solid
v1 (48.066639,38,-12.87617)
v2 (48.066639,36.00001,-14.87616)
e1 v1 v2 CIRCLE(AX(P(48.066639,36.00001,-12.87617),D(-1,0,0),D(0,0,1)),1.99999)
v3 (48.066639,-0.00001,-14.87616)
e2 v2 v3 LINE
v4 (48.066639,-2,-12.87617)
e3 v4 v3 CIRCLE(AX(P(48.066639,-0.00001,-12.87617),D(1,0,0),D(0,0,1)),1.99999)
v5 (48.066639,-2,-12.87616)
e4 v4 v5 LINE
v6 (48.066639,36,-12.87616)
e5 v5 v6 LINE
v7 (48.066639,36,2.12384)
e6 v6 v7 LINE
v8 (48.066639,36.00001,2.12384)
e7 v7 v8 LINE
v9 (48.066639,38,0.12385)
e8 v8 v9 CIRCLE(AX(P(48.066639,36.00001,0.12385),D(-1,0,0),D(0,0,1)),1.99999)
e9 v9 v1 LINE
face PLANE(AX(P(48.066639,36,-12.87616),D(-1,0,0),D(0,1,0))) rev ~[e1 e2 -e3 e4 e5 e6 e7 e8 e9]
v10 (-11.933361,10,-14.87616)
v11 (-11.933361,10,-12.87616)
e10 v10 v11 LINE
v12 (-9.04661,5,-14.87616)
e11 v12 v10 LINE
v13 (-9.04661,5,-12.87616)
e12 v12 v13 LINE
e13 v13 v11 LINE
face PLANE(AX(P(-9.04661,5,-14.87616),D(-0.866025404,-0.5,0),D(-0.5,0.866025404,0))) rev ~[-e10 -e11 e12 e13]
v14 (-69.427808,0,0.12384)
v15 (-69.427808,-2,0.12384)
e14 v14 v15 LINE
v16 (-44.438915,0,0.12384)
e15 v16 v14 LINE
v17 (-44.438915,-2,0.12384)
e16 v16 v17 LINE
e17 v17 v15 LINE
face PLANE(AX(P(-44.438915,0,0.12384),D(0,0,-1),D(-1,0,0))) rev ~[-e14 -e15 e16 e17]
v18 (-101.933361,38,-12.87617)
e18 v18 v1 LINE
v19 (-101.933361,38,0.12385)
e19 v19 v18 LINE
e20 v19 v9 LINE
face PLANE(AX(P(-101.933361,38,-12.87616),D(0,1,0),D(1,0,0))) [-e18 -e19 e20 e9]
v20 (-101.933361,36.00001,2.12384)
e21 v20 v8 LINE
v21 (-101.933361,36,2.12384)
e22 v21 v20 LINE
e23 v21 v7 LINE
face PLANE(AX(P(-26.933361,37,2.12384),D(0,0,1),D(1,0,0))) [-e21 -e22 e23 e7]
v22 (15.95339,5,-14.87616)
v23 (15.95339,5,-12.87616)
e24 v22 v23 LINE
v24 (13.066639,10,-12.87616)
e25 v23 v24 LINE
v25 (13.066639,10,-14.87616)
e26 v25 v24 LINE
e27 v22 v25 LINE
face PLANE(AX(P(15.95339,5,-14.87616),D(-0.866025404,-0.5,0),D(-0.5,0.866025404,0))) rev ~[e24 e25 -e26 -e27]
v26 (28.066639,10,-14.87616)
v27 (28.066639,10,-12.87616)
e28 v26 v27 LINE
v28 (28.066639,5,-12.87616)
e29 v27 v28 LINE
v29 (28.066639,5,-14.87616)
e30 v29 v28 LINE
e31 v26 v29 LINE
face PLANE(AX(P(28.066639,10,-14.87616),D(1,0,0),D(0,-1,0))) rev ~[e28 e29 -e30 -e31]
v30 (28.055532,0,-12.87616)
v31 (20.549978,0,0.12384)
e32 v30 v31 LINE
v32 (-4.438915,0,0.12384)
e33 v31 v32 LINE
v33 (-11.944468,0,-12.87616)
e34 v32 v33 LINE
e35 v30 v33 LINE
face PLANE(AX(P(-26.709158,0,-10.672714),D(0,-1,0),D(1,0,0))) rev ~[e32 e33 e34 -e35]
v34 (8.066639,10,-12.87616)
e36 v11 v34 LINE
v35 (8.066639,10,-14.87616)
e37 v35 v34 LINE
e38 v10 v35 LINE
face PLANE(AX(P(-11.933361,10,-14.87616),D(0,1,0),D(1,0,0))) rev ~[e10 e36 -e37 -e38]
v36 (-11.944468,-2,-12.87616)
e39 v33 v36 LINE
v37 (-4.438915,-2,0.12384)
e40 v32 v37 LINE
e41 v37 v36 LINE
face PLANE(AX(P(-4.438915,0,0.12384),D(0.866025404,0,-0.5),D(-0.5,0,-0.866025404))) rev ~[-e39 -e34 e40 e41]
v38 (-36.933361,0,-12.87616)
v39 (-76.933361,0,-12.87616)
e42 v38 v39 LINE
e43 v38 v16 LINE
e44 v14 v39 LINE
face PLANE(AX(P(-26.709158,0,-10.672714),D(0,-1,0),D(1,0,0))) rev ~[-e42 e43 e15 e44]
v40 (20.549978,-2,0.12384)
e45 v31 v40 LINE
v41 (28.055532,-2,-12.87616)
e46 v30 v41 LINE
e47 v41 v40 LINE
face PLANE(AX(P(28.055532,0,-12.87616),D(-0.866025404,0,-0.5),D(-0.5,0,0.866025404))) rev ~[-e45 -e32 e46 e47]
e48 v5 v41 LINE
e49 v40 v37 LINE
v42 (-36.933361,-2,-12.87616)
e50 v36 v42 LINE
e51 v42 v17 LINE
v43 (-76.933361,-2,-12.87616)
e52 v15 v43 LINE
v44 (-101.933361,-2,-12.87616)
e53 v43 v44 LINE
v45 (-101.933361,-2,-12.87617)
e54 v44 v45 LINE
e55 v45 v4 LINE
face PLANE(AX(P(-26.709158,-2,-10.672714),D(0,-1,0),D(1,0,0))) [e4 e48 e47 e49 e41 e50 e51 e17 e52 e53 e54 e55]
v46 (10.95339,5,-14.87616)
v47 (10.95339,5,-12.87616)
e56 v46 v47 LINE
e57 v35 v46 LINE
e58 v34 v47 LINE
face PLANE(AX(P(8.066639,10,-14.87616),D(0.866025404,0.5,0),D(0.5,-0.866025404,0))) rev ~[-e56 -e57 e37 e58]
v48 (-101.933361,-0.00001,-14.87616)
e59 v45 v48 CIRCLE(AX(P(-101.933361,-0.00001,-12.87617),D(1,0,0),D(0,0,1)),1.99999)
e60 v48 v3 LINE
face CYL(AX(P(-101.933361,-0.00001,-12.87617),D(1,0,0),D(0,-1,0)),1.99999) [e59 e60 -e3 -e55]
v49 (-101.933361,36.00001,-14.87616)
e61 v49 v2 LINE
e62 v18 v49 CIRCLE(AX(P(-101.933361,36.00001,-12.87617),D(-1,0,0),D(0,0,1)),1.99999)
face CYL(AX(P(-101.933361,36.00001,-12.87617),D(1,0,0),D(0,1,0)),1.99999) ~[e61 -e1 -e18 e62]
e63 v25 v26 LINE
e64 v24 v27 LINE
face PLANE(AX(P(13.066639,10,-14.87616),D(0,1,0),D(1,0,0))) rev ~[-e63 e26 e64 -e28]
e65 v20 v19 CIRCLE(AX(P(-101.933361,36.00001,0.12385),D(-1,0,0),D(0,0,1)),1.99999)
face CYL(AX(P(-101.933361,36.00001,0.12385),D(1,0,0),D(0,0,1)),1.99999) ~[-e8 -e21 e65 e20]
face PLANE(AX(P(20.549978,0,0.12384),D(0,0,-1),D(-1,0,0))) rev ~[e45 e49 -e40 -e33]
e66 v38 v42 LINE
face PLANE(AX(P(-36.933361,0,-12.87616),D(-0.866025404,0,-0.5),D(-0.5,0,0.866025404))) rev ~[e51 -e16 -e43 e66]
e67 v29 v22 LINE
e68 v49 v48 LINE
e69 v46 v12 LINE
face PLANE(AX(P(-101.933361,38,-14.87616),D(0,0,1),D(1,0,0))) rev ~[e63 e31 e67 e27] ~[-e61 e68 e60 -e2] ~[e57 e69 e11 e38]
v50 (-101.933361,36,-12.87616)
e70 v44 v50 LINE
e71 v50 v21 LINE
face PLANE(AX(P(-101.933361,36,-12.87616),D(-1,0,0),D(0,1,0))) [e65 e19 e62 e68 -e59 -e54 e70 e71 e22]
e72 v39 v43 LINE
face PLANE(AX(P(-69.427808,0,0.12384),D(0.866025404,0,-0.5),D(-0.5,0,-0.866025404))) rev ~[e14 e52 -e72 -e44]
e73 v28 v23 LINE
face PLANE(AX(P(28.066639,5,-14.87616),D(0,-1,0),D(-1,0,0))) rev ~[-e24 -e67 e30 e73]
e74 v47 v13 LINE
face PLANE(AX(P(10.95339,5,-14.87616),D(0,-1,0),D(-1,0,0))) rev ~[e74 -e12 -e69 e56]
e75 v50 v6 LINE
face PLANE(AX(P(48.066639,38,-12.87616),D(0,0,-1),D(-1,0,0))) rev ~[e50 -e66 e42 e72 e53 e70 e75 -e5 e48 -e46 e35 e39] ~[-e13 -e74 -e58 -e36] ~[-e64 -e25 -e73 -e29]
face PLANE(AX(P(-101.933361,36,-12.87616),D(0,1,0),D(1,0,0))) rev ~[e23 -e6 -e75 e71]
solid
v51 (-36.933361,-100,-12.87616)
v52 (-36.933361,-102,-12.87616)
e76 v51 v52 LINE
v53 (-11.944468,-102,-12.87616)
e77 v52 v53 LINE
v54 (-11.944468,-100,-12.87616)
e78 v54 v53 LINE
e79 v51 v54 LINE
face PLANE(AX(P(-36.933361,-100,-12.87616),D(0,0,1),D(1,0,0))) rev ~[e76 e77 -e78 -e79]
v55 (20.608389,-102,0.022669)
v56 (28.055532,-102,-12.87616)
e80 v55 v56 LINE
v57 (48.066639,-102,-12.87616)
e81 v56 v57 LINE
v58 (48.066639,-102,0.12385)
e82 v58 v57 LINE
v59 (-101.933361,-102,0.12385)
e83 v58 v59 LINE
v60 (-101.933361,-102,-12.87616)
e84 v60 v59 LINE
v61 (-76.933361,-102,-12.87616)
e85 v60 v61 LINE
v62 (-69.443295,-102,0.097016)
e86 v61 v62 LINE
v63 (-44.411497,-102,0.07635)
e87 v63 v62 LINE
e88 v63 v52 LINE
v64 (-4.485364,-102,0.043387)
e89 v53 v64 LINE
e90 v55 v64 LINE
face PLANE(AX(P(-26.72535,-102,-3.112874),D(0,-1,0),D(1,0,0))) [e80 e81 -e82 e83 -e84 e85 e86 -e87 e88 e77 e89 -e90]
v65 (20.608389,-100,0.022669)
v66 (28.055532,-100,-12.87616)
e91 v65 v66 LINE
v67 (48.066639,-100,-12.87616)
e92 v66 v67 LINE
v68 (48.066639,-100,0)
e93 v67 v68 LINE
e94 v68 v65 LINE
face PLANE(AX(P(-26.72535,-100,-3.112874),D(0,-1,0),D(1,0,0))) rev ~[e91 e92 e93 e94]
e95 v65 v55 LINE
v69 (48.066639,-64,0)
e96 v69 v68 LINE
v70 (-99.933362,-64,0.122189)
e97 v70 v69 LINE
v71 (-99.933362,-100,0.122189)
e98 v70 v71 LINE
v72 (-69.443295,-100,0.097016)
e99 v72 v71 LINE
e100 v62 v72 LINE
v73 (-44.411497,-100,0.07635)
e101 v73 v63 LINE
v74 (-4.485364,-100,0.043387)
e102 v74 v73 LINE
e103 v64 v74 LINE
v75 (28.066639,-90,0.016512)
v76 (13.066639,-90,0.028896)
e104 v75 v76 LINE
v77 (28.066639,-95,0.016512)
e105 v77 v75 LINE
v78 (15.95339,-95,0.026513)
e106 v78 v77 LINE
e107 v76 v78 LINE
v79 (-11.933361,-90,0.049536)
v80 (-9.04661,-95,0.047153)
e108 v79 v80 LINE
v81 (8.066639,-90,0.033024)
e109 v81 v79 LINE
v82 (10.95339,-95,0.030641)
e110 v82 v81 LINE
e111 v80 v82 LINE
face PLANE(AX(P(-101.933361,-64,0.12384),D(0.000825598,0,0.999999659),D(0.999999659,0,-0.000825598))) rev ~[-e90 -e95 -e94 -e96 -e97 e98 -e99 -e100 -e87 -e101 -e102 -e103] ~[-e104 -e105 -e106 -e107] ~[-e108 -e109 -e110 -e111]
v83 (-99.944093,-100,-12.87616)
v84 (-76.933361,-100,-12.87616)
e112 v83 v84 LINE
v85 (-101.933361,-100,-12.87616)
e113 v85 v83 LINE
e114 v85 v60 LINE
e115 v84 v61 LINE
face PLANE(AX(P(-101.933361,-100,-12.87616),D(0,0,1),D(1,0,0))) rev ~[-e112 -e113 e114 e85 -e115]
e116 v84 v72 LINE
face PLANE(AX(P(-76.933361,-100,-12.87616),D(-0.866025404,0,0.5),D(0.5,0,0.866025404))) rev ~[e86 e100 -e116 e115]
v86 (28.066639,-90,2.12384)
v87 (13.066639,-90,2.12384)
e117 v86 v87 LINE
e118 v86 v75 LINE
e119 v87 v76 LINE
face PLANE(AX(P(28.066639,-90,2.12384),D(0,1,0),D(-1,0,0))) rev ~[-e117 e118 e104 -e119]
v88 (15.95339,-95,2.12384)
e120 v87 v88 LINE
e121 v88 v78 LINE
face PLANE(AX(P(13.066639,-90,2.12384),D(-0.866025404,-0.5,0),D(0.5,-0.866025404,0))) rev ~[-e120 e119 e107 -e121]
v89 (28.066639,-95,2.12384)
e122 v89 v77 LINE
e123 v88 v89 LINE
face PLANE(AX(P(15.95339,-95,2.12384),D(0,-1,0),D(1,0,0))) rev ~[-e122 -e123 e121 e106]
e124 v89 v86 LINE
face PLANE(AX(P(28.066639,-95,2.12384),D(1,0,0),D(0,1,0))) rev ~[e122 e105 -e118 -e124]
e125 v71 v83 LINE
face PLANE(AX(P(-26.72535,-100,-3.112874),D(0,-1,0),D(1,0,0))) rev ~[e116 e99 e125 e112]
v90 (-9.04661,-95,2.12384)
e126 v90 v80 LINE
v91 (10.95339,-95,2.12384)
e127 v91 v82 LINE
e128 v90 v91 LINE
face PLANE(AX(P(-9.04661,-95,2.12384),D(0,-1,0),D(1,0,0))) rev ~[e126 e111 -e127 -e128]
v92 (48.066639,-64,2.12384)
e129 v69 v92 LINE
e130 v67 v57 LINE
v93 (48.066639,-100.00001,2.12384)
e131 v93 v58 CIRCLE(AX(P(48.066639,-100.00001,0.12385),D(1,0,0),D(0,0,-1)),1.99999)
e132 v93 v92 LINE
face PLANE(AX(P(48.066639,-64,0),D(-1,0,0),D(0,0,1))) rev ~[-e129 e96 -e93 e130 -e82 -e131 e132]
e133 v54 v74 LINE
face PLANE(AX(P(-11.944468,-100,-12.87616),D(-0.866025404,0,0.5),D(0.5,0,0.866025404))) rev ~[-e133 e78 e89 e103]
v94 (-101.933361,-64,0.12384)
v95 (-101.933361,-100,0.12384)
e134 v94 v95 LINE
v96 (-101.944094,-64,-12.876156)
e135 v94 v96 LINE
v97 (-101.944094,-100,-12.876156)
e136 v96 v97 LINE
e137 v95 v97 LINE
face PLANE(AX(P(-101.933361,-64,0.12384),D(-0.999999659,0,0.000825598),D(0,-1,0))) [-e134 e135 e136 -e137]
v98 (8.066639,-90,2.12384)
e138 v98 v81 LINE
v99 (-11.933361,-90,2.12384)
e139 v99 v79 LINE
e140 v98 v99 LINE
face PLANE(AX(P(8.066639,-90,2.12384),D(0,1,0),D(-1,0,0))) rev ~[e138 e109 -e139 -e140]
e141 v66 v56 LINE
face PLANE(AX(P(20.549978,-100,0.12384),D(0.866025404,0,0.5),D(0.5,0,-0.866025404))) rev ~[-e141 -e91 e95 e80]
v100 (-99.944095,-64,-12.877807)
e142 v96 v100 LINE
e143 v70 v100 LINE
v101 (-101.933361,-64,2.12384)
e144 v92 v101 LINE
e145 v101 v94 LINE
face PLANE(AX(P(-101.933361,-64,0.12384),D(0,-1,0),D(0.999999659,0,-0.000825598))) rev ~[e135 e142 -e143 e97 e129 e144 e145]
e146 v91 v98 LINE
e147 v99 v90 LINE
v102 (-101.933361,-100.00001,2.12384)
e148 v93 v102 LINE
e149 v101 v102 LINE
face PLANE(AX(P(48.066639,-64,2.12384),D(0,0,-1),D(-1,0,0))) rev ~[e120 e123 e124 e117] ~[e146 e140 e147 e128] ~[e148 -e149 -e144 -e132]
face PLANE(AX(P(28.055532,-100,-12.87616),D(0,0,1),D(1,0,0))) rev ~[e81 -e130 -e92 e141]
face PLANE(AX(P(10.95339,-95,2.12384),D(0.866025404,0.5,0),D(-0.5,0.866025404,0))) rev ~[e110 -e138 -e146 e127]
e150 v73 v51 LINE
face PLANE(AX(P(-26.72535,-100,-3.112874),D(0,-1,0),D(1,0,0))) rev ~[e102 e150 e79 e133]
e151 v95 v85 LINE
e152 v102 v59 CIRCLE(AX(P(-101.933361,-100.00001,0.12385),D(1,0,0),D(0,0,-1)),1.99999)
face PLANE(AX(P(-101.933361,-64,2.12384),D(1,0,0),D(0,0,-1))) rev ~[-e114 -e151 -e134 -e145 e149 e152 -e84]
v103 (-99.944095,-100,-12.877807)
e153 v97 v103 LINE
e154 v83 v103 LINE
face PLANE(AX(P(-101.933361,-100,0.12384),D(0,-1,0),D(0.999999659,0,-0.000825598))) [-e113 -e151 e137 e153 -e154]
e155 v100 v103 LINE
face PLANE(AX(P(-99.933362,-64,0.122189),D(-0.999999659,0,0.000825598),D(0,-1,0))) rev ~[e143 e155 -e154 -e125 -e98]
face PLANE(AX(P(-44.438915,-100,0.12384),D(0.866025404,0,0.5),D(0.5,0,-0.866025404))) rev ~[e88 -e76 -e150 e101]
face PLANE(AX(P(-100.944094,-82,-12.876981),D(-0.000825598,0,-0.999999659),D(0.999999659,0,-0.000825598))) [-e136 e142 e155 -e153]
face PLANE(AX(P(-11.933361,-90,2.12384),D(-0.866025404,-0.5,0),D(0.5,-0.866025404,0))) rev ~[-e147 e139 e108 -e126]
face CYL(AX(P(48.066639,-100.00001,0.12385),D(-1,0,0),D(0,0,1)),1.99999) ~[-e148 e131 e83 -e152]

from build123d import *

# Parameters (mm, degrees)
F1_DEPTH  = 2
F4_DEPTH  = 2
F7_DEPTH  = 38
F10_DEPTH = 38
F11_W     = 150
F11_H     = 2
F12_DEPTH = 15
F13_W     = 2
F13_H     = 36
F14_DEPTH = 13
F16_DEPTH = 25
F18_DEPTH = 25
F19_R     = 1.99999
F19_2_R   = 1.99999
F20_R     = 1.99999


# Not quite as in the source:
# - a fillet or chamfer is up to 0.001 mm smaller than in the source, because OpenCascade refuses the exact size


with BuildPart() as f1:
    # F0 (on Front) → F1 (new body)
    with BuildSketch(Plane.XZ):
        Polygon((-76.9333613626, -12.8761603036), (-101.9333613626, -12.8761603036), (-101.9333613626, -14.8761603036), (48.0666386374, -14.8761603036), (48.0666386374, -12.8761603036), (28.0555316385, -12.8761603036), (20.549978139, 0.1238396964), (-4.438914862, 0.1238396964), (-11.9444683615, -12.8761603036), (-36.9333613626, -12.8761603036), (-44.438914862, 0.1238396964), (-69.4278078631, 0.1238396964), align=None)
    extrude(amount=F1_DEPTH)

    # F6 (on offset) → F7 (join, through all)
    with BuildSketch(Plane.XZ.offset(-38)):
        Polygon((-36.9333613626, -12.8761603036), (-76.9333613626, -12.8761603036), (-101.9333613626, -12.8761603036), (-101.9333613626, -14.8761603036), (48.0666386374, -14.8761603036), (48.0666386374, -12.8761603036), (28.0555316385, -12.8761603036), (-11.9444683615, -12.8761603036), align=None)
    extrude(amount=F7_DEPTH)

    # F11 (on face) → F12 (join)
    with BuildSketch(Plane.XY.offset(-12.8761603036)):
        with Locations((-26.9333613626, 37)):
            Rectangle(F11_W, F11_H)
    extrude(amount=F12_DEPTH)

    # F17 (on face) → F18 (cut)
    with BuildSketch(Plane(origin=(0, 0, -14.8761603036), x_dir=(1, 0, 0), z_dir=(0, 0, -1))):
        Polygon((-11.9333613626, -10), (8.0666386374, -10), (10.9533899834, -5), (-9.0466100166, -5), align=None)
        Polygon((13.0666386374, -10), (28.0666386374, -10), (28.0666386374, -5), (15.9533899834, -5), align=None)
    extrude(amount=-F18_DEPTH, mode=Mode.SUBTRACT)

    # F19 (radius 2 in the source; OpenCascade refuses exactly that, so slightly less here)
    f19_edges = [f1.edges().sort_by_distance(p)[0] for p in [
        (-26.933361, 38, -14.87616),
        (-26.933361, 38, 2.12384),
    ]]
    fillet(f19_edges, radius=F19_R)

    # F20 (radius 2 in the source; OpenCascade refuses exactly that, so slightly less here)
    f20_edges = [f1.edges().sort_by_distance(p)[0] for p in [
        (-26.933361, -2, -14.87616),
    ]]
    fillet(f20_edges, radius=F20_R)


with BuildPart() as f4:
    # F3 (on offset) → F4 (new body)
    with BuildSketch(Plane.XZ.offset(100)):
        Polygon((-101.9333613626, 0.1238396964), (-101.9333613626, -12.8761603036), (-76.9333613626, -12.8761603036), (-69.4278078631, 0.1238396964), (-44.438914862, 0.1238396964), (-36.9333613626, -12.8761603036), (-11.9444683615, -12.8761603036), (-4.438914862, 0.1238396964), (20.549978139, 0.1238396964), (28.0555316385, -12.8761603036), (48.0666386374, -12.8761603036), (48.0666386374, 0.1238396964), (48.0666386374, 2.1238396964), (-101.9333613626, 2.1238396964), align=None)
    extrude(amount=F4_DEPTH)

    # F9 (on offset) → F10 (join)
    with BuildSketch(Plane.XZ.offset(64)):
        Polygon((48.0666386374, 2.1238396964), (-101.9333613626, 2.1238396964), (-101.9333613626, 0.1238396964), (-69.4432945528, 0.097015963), (-44.4114965352, 0.0763497612), (-4.4853643477, 0.0433868273), (20.6083887933, 0.0226694755), (48.0666386374, 0), align=None)
    extrude(amount=F10_DEPTH)

    # F13 (on face) → F14 (join)
    with BuildSketch(Plane(origin=(3.27628e-05, 0, 0.0396836925), x_dir=(0.9999996592, 0, -0.0008255977), z_dir=(-0.0008255977, 0, -0.9999996592))):
        with Locations((-100.9334288649, 82)):
            Rectangle(F13_W, F13_H)
    extrude(amount=F14_DEPTH)

    # F15 (on face) → F16 (cut)
    with BuildSketch(Plane.XY.offset(2.1238396964)):
        Polygon((10.9533899834, -95), (8.0666386374, -90), (-11.9333613626, -90), (-9.0466100166, -95), align=None)
        Polygon((28.0666386374, -95), (28.0666386374, -90), (13.0666386374, -90), (15.9533899834, -95), align=None)
    extrude(amount=-F16_DEPTH, mode=Mode.SUBTRACT)

    # F19#2 (radius 2 in the source; OpenCascade refuses exactly that, so slightly less here)
    f19_2_edges = [f4.edges().sort_by_distance(p)[0] for p in [
        (-26.933361, -102, 2.12384),
    ]]
    fillet(f19_2_edges, radius=F19_2_R)


solid = Compound([f1.part, f4.part])
